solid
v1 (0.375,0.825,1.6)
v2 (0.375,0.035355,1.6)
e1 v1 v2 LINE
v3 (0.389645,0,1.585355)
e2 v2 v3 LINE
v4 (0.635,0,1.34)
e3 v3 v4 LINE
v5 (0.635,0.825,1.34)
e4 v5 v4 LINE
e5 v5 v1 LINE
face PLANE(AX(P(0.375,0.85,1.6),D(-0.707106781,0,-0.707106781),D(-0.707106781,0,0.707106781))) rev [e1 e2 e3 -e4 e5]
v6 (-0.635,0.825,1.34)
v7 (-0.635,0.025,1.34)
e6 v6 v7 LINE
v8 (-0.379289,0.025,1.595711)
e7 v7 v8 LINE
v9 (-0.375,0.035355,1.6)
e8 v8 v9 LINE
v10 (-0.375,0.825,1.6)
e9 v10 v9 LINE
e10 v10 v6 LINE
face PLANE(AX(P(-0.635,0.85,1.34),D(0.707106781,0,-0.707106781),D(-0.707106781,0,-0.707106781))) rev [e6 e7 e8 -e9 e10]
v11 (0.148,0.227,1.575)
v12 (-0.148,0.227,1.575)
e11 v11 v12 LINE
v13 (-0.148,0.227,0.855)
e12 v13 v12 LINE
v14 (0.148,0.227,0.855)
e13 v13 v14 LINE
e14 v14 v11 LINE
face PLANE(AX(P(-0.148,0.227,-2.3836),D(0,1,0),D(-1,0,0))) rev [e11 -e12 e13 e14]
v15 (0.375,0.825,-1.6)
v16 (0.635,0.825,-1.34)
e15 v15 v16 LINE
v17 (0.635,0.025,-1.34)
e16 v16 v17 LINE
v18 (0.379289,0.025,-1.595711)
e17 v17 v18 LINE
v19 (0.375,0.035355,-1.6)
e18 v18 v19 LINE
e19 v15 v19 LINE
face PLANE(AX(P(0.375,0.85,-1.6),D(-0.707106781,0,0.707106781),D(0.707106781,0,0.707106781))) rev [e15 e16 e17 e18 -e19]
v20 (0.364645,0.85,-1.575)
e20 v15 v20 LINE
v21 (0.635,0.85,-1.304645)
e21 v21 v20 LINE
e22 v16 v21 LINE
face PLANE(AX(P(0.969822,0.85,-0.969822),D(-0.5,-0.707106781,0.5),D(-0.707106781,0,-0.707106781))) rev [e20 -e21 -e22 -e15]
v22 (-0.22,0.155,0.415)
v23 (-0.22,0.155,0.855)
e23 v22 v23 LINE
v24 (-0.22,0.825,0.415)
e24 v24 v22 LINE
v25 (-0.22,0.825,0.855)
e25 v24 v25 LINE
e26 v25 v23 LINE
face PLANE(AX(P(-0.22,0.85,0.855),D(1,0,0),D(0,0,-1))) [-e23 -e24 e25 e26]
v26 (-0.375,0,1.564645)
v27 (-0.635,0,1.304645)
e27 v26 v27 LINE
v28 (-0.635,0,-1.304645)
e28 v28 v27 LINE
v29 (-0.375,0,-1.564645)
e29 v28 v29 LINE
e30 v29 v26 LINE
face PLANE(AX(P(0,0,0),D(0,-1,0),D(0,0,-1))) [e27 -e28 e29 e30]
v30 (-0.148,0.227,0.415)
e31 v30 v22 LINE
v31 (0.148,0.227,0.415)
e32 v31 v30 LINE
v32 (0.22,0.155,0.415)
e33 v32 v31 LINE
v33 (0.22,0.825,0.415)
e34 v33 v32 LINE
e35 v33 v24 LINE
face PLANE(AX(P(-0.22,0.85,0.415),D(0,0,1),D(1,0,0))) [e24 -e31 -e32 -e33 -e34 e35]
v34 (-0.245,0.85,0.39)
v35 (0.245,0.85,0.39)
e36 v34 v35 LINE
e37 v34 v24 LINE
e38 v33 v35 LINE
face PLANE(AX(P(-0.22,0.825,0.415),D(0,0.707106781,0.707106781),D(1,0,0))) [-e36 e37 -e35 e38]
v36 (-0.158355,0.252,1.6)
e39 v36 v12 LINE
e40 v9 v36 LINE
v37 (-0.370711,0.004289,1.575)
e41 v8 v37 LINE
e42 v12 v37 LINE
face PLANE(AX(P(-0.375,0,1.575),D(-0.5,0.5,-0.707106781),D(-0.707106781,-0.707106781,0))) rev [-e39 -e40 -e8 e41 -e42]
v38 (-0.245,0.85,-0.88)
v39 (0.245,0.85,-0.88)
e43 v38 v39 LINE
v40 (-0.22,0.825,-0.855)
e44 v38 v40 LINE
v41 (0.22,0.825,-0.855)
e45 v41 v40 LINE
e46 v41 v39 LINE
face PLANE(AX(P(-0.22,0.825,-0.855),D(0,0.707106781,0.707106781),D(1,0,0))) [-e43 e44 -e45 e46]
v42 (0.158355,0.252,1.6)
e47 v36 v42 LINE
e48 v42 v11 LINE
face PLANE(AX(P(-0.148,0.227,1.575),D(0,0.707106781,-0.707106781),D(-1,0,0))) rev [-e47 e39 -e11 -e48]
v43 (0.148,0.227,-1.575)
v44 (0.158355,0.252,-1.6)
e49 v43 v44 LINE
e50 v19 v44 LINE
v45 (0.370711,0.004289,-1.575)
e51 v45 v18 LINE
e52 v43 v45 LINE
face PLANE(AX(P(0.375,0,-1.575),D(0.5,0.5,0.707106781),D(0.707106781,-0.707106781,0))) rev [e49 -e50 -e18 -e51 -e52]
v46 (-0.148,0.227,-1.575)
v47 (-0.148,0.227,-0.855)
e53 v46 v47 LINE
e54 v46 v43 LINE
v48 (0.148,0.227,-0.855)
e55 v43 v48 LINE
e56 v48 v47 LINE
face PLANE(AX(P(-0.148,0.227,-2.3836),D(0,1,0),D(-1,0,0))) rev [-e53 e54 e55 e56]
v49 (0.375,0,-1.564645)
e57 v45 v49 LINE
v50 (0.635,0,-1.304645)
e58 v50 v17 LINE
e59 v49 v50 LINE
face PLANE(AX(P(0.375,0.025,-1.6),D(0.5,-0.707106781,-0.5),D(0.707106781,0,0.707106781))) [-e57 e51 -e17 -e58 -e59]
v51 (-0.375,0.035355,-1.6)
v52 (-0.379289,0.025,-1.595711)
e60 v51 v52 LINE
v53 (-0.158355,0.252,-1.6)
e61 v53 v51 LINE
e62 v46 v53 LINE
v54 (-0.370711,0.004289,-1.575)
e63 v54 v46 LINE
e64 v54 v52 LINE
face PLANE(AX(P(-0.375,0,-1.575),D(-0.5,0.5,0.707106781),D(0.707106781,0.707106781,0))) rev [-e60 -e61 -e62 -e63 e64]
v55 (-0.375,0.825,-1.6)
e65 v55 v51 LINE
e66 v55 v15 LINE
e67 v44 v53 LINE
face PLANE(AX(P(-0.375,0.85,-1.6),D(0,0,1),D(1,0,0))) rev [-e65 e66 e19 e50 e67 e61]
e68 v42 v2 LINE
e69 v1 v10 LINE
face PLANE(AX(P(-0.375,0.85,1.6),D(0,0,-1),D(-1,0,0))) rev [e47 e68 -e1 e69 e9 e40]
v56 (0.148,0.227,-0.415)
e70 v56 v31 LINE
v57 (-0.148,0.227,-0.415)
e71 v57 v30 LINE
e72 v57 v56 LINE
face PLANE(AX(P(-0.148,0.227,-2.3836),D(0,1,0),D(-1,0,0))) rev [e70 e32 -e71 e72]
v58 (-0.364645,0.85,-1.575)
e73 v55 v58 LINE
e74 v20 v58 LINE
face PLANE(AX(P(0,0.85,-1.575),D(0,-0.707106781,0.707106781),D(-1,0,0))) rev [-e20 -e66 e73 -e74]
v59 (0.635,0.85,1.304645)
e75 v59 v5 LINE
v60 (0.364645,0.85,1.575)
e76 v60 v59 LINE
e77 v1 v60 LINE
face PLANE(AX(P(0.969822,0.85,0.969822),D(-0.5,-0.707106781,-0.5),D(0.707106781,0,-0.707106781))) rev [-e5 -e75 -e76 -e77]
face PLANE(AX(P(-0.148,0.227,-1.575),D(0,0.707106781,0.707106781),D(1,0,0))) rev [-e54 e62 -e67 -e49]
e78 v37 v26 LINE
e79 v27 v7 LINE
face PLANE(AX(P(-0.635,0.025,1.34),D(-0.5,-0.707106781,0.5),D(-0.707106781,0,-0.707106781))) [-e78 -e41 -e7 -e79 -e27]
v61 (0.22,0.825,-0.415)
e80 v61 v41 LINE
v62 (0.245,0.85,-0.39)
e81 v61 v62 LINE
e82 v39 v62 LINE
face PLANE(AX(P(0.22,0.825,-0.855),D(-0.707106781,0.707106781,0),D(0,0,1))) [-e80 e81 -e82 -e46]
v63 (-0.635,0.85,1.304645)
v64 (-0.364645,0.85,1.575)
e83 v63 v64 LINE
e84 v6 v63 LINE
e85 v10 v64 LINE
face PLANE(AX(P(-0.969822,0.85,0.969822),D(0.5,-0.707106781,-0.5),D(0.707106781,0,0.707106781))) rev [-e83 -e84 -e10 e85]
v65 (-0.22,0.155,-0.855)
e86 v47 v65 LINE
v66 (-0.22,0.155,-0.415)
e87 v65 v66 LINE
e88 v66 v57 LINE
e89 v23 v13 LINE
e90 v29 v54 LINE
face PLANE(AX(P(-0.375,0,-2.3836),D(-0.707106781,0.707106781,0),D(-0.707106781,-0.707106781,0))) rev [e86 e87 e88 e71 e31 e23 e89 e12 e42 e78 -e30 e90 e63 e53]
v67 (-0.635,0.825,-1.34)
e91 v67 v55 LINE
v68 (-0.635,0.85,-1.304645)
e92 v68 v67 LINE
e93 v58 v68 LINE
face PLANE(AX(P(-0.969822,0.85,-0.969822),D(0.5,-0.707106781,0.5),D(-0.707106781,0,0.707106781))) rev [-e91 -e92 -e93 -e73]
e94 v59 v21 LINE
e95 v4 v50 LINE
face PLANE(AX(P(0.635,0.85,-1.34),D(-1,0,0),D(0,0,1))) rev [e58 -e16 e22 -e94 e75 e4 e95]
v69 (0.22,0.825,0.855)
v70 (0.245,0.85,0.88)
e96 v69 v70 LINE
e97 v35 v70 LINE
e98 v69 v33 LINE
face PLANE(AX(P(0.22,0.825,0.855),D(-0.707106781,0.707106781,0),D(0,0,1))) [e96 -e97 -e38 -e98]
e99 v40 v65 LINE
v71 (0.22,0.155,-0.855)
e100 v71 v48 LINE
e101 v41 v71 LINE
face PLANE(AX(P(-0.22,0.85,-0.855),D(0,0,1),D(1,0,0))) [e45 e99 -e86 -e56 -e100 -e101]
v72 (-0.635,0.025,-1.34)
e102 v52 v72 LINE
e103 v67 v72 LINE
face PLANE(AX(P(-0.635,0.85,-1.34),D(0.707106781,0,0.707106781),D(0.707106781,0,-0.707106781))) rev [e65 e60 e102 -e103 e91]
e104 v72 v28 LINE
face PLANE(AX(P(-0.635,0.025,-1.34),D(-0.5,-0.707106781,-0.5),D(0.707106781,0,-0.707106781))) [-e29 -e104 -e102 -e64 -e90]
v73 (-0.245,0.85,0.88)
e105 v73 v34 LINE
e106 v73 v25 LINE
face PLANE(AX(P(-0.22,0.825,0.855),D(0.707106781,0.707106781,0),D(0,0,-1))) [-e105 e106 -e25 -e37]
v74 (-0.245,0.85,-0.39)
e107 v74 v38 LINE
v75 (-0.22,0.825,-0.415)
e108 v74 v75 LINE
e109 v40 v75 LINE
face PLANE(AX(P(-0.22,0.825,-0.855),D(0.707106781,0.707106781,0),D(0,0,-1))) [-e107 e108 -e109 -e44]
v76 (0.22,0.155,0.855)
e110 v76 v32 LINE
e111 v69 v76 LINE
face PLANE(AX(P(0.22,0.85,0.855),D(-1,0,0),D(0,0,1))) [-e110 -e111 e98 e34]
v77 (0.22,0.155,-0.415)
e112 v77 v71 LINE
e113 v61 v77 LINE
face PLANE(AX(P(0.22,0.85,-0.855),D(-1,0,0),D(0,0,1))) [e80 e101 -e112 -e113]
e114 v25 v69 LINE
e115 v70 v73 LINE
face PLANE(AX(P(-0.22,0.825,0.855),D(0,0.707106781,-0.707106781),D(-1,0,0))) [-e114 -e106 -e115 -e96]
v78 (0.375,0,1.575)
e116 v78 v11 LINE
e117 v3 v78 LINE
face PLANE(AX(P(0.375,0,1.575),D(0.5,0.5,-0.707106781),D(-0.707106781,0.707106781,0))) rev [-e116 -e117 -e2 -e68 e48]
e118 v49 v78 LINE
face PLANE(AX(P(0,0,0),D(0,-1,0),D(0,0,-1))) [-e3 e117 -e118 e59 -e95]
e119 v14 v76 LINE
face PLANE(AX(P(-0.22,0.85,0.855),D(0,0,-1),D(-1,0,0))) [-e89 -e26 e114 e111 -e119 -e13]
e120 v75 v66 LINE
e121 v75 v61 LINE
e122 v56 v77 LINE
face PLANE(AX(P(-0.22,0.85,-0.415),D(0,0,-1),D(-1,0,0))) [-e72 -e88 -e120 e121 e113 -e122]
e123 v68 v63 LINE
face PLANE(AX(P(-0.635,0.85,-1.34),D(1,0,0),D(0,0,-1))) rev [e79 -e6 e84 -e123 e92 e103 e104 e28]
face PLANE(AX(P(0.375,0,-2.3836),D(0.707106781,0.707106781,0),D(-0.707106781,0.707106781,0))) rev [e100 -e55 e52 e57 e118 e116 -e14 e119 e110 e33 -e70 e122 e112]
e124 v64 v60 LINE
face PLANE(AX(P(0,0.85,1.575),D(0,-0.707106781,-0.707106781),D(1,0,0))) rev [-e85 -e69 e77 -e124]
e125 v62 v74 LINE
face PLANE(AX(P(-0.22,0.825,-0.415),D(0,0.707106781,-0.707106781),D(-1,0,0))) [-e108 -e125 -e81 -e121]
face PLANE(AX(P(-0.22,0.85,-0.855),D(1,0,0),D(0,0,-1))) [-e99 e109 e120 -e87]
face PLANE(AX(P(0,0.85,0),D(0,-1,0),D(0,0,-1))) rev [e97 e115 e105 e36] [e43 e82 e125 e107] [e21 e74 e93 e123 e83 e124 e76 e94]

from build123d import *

# Parameters (mm, degrees)
SKETCH5_W           = 0.44
SKETCH5_H           = 0.44
BOSS_EXTRUDE1_DEPTH = 0.85
CUT_EXTRUDE1_REACH  = 5.371
CHAMFER1_SIZE       = 0.025


with BuildPart() as part:
    # Sketch5 → Boss-Extrude1 (new body)
    with BuildSketch(Plane(origin=(0, 0, 0), x_dir=(1, 0, 0), z_dir=(0, 1, 0))):
        Polygon((-0.375, 1.6), (0.375, 1.6), (0.635, 1.34), (0.635, -1.34), (0.375, -1.6), (-0.375, -1.6), (-0.635, -1.34), (-0.635, 1.34), align=None)
        with Locations((0, 0.635)):
            Rectangle(SKETCH5_W, SKETCH5_H, mode=Mode.SUBTRACT)
        with Locations((0, -0.635)):
            Rectangle(SKETCH5_W, SKETCH5_H, mode=Mode.SUBTRACT)
    extrude(amount=BOSS_EXTRUDE1_DEPTH)

    # Cut-Extrude1: up to this face of the body (flat: up to its plane)
    cut_extrude1_end = Plane(part.part.faces().sort_by_distance((0, 0.425, -1.6))[0])
    # Sketch6 → Cut-Extrude1 (cut, up to the picked face)
    with BuildSketch(Plane.XY.offset(1.6), mode=Mode.PRIVATE) as cut_extrude1_sk1:
        Polygon((-0.375, 0), (-0.148, 0.227), (0.148, 0.227), (0.375, 0), align=None)
    cut_extrude1_tool1 = split(extrude(cut_extrude1_sk1.sketch, amount=-CUT_EXTRUDE1_REACH, mode=Mode.PRIVATE), bisect_by=cut_extrude1_end, keep=Keep.BOTH, mode=Mode.PRIVATE)
    add(cut_extrude1_tool1.solids().sort_by(Axis((0, 0.097079, 1.6), (0, 0, -1)))[0], mode=Mode.SUBTRACT)

    # Chamfer1
    # the kernel refuses this chamfer: 0.025 mm, written as the material it takes off along each edge
    with BuildSketch(Plane(origin=(-0.329538638, 0, 1.645461362), x_dir=(0.7068394360706735, -0.027495876610586514, -0.7068394360706735), z_dir=(-0.7071067811865476, 0, -0.7071067811865476)), Plane(origin=(0.329538638, 0.85, -1.645461362), x_dir=(0.019442520806015277, -0.9996219169112966, -0.01944252080601526), z_dir=(0.7071067811865472, 0, 0.7071067811865479))) as chamfer1_piece_1:
        Polygon((CHAMFER1_SIZE * 0.999621916911, -CHAMFER1_SIZE * 0.0274958766106), (-CHAMFER1_SIZE * 0.0274958766106, -CHAMFER1_SIZE * 0.999621916911), (0, 0), align=None)
    extrude(amount=0.496279676, mode=Mode.SUBTRACT)
    with BuildSketch(Plane(origin=(-0.680461362, 0, -1.294538638), x_dir=(-0.01944252080601428, 0.9996219169112966, -0.019442520806014163), z_dir=(0.7071067811865455, 0, -0.7071067811865497)), Plane(origin=(-0.329538638, 0.85, 1.645461362), x_dir=(0.7068394360706735, 0.027495876610587406, -0.7068394360706735), z_dir=(-0.7071067811865476, 0, -0.7071067811865476)), Plane(origin=(0.680461362, 0.85, 1.294538638), x_dir=(-0.7068394360706735, 0.02749587661058749, -0.7068394360706735), z_dir=(-0.7071067811865476, 0, 0.7071067811865476)), Plane(origin=(-0.680461362, 0.85, -1.294538638), x_dir=(0.7068394360706755, 0.02749587661058732, 0.7068394360706715), z_dir=(0.7071067811865455, 0, -0.7071067811865497)), Plane(origin=(0.329538638, 0, -1.645461362), x_dir=(0.019442520806010995, 0.9996219169112968, -0.019442520806010978), z_dir=(0.7071067811865472, 0, 0.7071067811865479))) as chamfer1_piece_2:
        Polygon((CHAMFER1_SIZE * 0.999621916911, CHAMFER1_SIZE * 0.0274958766106), (-CHAMFER1_SIZE * 0.0274958766106, CHAMFER1_SIZE * 0.999621916911), (0, 0), align=None)
    extrude(amount=0.496279676, mode=Mode.SUBTRACT)
    with BuildSketch(Plane(origin=(0.439292075, 0.85, 1.6), x_dir=(0, 0.02749587661058742, -0.9996219169112966), z_dir=(-1, 0, 0))) as chamfer1_piece_3:
        Polygon((CHAMFER1_SIZE * 0.999621916911, CHAMFER1_SIZE * 0.0274958766106), (-CHAMFER1_SIZE * 0.0274958766106, CHAMFER1_SIZE * 0.999621916911), (0, 0), align=None)
    extrude(amount=0.878584149, mode=Mode.SUBTRACT)
    with BuildSketch(Plane(origin=(0.22, 0.85, -0.855), x_dir=(0.9996219169112966, 0.02749587661058736, 0), z_dir=(0, 0, 1)), Plane(origin=(-0.22, 0.85, -0.855), x_dir=(0, 0.027495876610587302, -0.9996219169112966), z_dir=(1, 0, 0)), Plane(origin=(-0.22, 0.85, -0.415), x_dir=(-0.9996219169112966, 0.02749587661058736, 0), z_dir=(0, 0, -1)), Plane(origin=(0.22, 0.85, -0.415), x_dir=(0, 0.027495876610587302, 0.9996219169112966), z_dir=(-1, 0, 0)), Plane(origin=(-0.22, 0.85, 0.855), x_dir=(-0.9996219169112966, 0.02749587661058736, 0), z_dir=(0, 0, -1)), Plane(origin=(0.22, 0.85, 0.855), x_dir=(0, 0.027495876610587302, 0.9996219169112966), z_dir=(-1, 0, 0)), Plane(origin=(0.22, 0.85, 0.415), x_dir=(0.9996219169112966, 0.02749587661058736, 0), z_dir=(0, 0, 1)), Plane(origin=(-0.22, 0.85, 0.415), x_dir=(0, 0.027495876610587302, -0.9996219169112966), z_dir=(1, 0, 0))) as chamfer1_piece_4:
        Polygon((CHAMFER1_SIZE * 0.999621916911, -CHAMFER1_SIZE * 0.0274958766106), (-CHAMFER1_SIZE * 0.0274958766106, -CHAMFER1_SIZE * 0.999621916911), (0, 0), align=None)
    extrude(amount=0.44, mode=Mode.SUBTRACT)
    with BuildSketch(Plane(origin=(-0.439292075, 0.85, -1.6), x_dir=(0, -0.9996219169112966, -0.027495876610587302), z_dir=(1, 0, 0))) as chamfer1_piece_5:
        Polygon((CHAMFER1_SIZE * 0.999621916911, -CHAMFER1_SIZE * 0.0274958766106), (-CHAMFER1_SIZE * 0.0274958766106, -CHAMFER1_SIZE * 0.999621916911), (0, 0), align=None)
    extrude(amount=0.878584149, mode=Mode.SUBTRACT)
    with BuildSketch(Plane(origin=(0.102538638, 0.272461362, 1.6), x_dir=(-0.019442520806014184, -0.01944252080601436, -0.9996219169112966), z_dir=(0.7071067811865508, -0.7071067811865442, 0))) as chamfer1_piece_6_section:
        Polygon((CHAMFER1_SIZE * 0.999621916911, CHAMFER1_SIZE * 0.0274958766106), (-CHAMFER1_SIZE * 0.0274958766106, CHAMFER1_SIZE * 0.999621916911), (0, 0), align=None)
    chamfer1_piece_6 = extrude(amount=0.449610628, mode=Mode.PRIVATE)
    chamfer1_piece_6 = split(chamfer1_piece_6, bisect_by=Plane(origin=(0.292864015, 0.227, 1.591698889), z_dir=(0, -1, 0)), keep=Keep.TOP, mode=Mode.PRIVATE)
    add(chamfer1_piece_6, mode=Mode.SUBTRACT)
    with BuildSketch(Plane(origin=(-0.212292075, 0.227, 1.6), x_dir=(0, 0.9996219169112966, 0.02749587661058733), z_dir=(1, 0, 0))) as chamfer1_piece_7_section:
        Polygon((CHAMFER1_SIZE * 0.999621916911, -CHAMFER1_SIZE * 0.0274958766106), (-CHAMFER1_SIZE * 0.0274958766106, -CHAMFER1_SIZE * 0.999621916911), (0, 0), align=None)
    chamfer1_piece_7 = extrude(amount=0.424584149, mode=Mode.PRIVATE)
    chamfer1_piece_7 = split(chamfer1_piece_7, bisect_by=Plane(origin=(-0.070019575, 0.304980425, 1.591603337), z_dir=(0.707106781186544, -0.7071067811865511, 0)), keep=Keep.TOP, mode=Mode.PRIVATE)
    chamfer1_piece_7 = split(chamfer1_piece_7, bisect_by=Plane(origin=(0.070019575, 0.304980425, 1.591603337), z_dir=(-0.7071067811865442, -0.7071067811865508, 0)), keep=Keep.TOP, mode=Mode.PRIVATE)
    add(chamfer1_piece_7, mode=Mode.SUBTRACT)
    with BuildSketch(Plane(origin=(-0.420461362, -0.045461362, 1.6), x_dir=(0.019442520806013903, -0.019442520806014097, -0.9996219169112966), z_dir=(0.7071067811865511, 0.707106781186544, 0))) as chamfer1_piece_8_section:
        Polygon((CHAMFER1_SIZE * 0.999621916911, CHAMFER1_SIZE * 0.0274958766106), (-CHAMFER1_SIZE * 0.0274958766106, CHAMFER1_SIZE * 0.999621916911), (0, 0), align=None)
    chamfer1_piece_8 = extrude(amount=0.449610628, mode=Mode.PRIVATE)
    chamfer1_piece_8 = split(chamfer1_piece_8, bisect_by=Plane(origin=(-0.292864015, 0.227, 1.591698889), z_dir=(0, -1, 0)), keep=Keep.TOP, mode=Mode.PRIVATE)
    add(chamfer1_piece_8, mode=Mode.SUBTRACT)
    with BuildSketch(Plane(origin=(-0.420461362, -0.045461362, -1.6), x_dir=(-0.7068394360706672, 0.7068394360706742, -0.02749587661072924), z_dir=(0.7071067811865511, 0.707106781186544, 0))) as chamfer1_piece_9_section:
        Polygon((CHAMFER1_SIZE * 0.999621916911, CHAMFER1_SIZE * 0.0274958766107), (-CHAMFER1_SIZE * 0.0274958766006, CHAMFER1_SIZE * 0.999621916912), (0, 0), align=None)
    chamfer1_piece_9 = extrude(amount=0.449610628, mode=Mode.PRIVATE)
    chamfer1_piece_9 = split(chamfer1_piece_9, bisect_by=Plane(origin=(-0.292864015, 0.227, -1.591698889), z_dir=(0, -1, 0)), keep=Keep.TOP, mode=Mode.PRIVATE)
    add(chamfer1_piece_9, mode=Mode.SUBTRACT)
    with BuildSketch(Plane(origin=(-0.212292075, 0.227, -1.6), x_dir=(0, 0.9996219169112966, -0.02749587661058733), z_dir=(1, 0, 0))) as chamfer1_piece_10_section:
        Polygon((CHAMFER1_SIZE * 0.999621916911, CHAMFER1_SIZE * 0.0274958766106), (-CHAMFER1_SIZE * 0.0274958766106, CHAMFER1_SIZE * 0.999621916911), (0, 0), align=None)
    chamfer1_piece_10 = extrude(amount=0.424584149, mode=Mode.PRIVATE)
    chamfer1_piece_10 = split(chamfer1_piece_10, bisect_by=Plane(origin=(-0.070019575, 0.304980425, -1.591603337), z_dir=(0.707106781186544, -0.7071067811865511, 0)), keep=Keep.TOP, mode=Mode.PRIVATE)
    chamfer1_piece_10 = split(chamfer1_piece_10, bisect_by=Plane(origin=(0.070019575, 0.304980425, -1.591603337), z_dir=(-0.7071067811865442, -0.7071067811865508, 0)), keep=Keep.TOP, mode=Mode.PRIVATE)
    add(chamfer1_piece_10, mode=Mode.SUBTRACT)
    with BuildSketch(Plane(origin=(0.102538638, 0.272461362, -1.6), x_dir=(0.7068394360706932, 0.7068394360706998, -0.027495876609399512), z_dir=(0.7071067811865508, -0.7071067811865442, 0))) as chamfer1_piece_11_section:
        Polygon((CHAMFER1_SIZE * 0.999621916911, CHAMFER1_SIZE * 0.0274958766094), (-CHAMFER1_SIZE * 0.0274958766932, CHAMFER1_SIZE * 0.999621916909), (0, 0), align=None)
    chamfer1_piece_11 = extrude(amount=0.449610628, mode=Mode.PRIVATE)
    chamfer1_piece_11 = split(chamfer1_piece_11, bisect_by=Plane(origin=(0.292864015, 0.227, -1.591698889), z_dir=(0, -1, 0)), keep=Keep.TOP, mode=Mode.PRIVATE)
    add(chamfer1_piece_11, mode=Mode.SUBTRACT)
    with BuildSketch(Plane(origin=(0.22, 0.85, -0.919292075), x_dir=(0.9996219169112966, 0.02749587661058736, 0), z_dir=(0, 0, 1))) as chamfer1_piece_12a_section:
        Polygon((CHAMFER1_SIZE * 0.999621916911, -CHAMFER1_SIZE * 0.0274958766106), (-CHAMFER1_SIZE * 0.0274958766106, -CHAMFER1_SIZE * 0.999621916911), (0, 0), align=None)
    chamfer1_piece_12a = extrude(amount=0.504292075, mode=Mode.PRIVATE)
    chamfer1_piece_12a = split(chamfer1_piece_12a, bisect_by=Plane(origin=(0.228244841, 0.841755159, -0.855), z_dir=(0, 0, -1)), keep=Keep.TOP, mode=Mode.PRIVATE)
    with BuildSketch(Plane(origin=(-0.22, 0.85, -0.855), x_dir=(0, 0.027495876610587302, -0.9996219169112966), z_dir=(1, 0, 0))) as chamfer1_piece_12b_section:
        Polygon((CHAMFER1_SIZE * 0.999621916911, -CHAMFER1_SIZE * 0.0274958766106), (-CHAMFER1_SIZE * 0.0274958766106, -CHAMFER1_SIZE * 0.999621916911), (0, 0), align=None)
    chamfer1_piece_12b = extrude(amount=0.504292075, mode=Mode.PRIVATE)
    chamfer1_piece_12b = split(chamfer1_piece_12b, bisect_by=Plane(origin=(0.22, 0.841755159, -0.863244841), z_dir=(1, 0, 0)), keep=Keep.TOP, mode=Mode.PRIVATE)
    chamfer1_piece_12 = chamfer1_piece_12a & chamfer1_piece_12b
    add(chamfer1_piece_12, mode=Mode.SUBTRACT)
    with BuildSketch(Plane(origin=(0.284292075, 0.85, -0.415), x_dir=(0, 0.027495876610587302, 0.9996219169112966), z_dir=(-1, 0, 0))) as chamfer1_piece_13a_section:
        Polygon((CHAMFER1_SIZE * 0.999621916911, -CHAMFER1_SIZE * 0.0274958766106), (-CHAMFER1_SIZE * 0.0274958766106, -CHAMFER1_SIZE * 0.999621916911), (0, 0), align=None)
    chamfer1_piece_13a = extrude(amount=0.504292075, mode=Mode.PRIVATE)
    chamfer1_piece_13a = split(chamfer1_piece_13a, bisect_by=Plane(origin=(0.22, 0.841755159, -0.406755159), z_dir=(1, 0, 0)), keep=Keep.TOP, mode=Mode.PRIVATE)
    with BuildSketch(Plane(origin=(0.22, 0.85, -0.855), x_dir=(0.9996219169112966, 0.02749587661058736, 0), z_dir=(0, 0, 1))) as chamfer1_piece_13b_section:
        Polygon((CHAMFER1_SIZE * 0.999621916911, -CHAMFER1_SIZE * 0.0274958766106), (-CHAMFER1_SIZE * 0.0274958766106, -CHAMFER1_SIZE * 0.999621916911), (0, 0), align=None)
    chamfer1_piece_13b = extrude(amount=0.504292075, mode=Mode.PRIVATE)
    chamfer1_piece_13b = split(chamfer1_piece_13b, bisect_by=Plane(origin=(0.228244841, 0.841755159, -0.415), z_dir=(0, 0, 1)), keep=Keep.TOP, mode=Mode.PRIVATE)
    chamfer1_piece_13 = chamfer1_piece_13a & chamfer1_piece_13b
    add(chamfer1_piece_13, mode=Mode.SUBTRACT)
    with BuildSketch(Plane(origin=(-0.22, 0.85, -0.415), x_dir=(-0.9996219169112966, 0.02749587661058736, 0), z_dir=(0, 0, -1))) as chamfer1_piece_14a_section:
        Polygon((CHAMFER1_SIZE * 0.999621916911, -CHAMFER1_SIZE * 0.0274958766106), (-CHAMFER1_SIZE * 0.0274958766106, -CHAMFER1_SIZE * 0.999621916911), (0, 0), align=None)
    chamfer1_piece_14a = extrude(amount=0.504292075, mode=Mode.PRIVATE)
    chamfer1_piece_14a = split(chamfer1_piece_14a, bisect_by=Plane(origin=(-0.228244841, 0.841755159, -0.855), z_dir=(0, 0, -1)), keep=Keep.TOP, mode=Mode.PRIVATE)
    with BuildSketch(Plane(origin=(-0.284292075, 0.85, -0.855), x_dir=(0, 0.027495876610587302, -0.9996219169112966), z_dir=(1, 0, 0))) as chamfer1_piece_14b_section:
        Polygon((CHAMFER1_SIZE * 0.999621916911, -CHAMFER1_SIZE * 0.0274958766106), (-CHAMFER1_SIZE * 0.0274958766106, -CHAMFER1_SIZE * 0.999621916911), (0, 0), align=None)
    chamfer1_piece_14b = extrude(amount=0.504292075, mode=Mode.PRIVATE)
    chamfer1_piece_14b = split(chamfer1_piece_14b, bisect_by=Plane(origin=(-0.22, 0.841755159, -0.863244841), z_dir=(-1, 0, 0)), keep=Keep.TOP, mode=Mode.PRIVATE)
    chamfer1_piece_14 = chamfer1_piece_14a & chamfer1_piece_14b
    add(chamfer1_piece_14, mode=Mode.SUBTRACT)
    with BuildSketch(Plane(origin=(-0.22, 0.85, -0.350707925), x_dir=(-0.9996219169112966, 0.02749587661058736, 0), z_dir=(0, 0, -1))) as chamfer1_piece_15a_section:
        Polygon((CHAMFER1_SIZE * 0.999621916911, -CHAMFER1_SIZE * 0.0274958766106), (-CHAMFER1_SIZE * 0.0274958766106, -CHAMFER1_SIZE * 0.999621916911), (0, 0), align=None)
    chamfer1_piece_15a = extrude(amount=0.504292075, mode=Mode.PRIVATE)
    chamfer1_piece_15a = split(chamfer1_piece_15a, bisect_by=Plane(origin=(-0.228244841, 0.841755159, -0.415), z_dir=(0, 0, 1)), keep=Keep.TOP, mode=Mode.PRIVATE)
    with BuildSketch(Plane(origin=(0.22, 0.85, -0.415), x_dir=(0, 0.027495876610587302, 0.9996219169112966), z_dir=(-1, 0, 0))) as chamfer1_piece_15b_section:
        Polygon((CHAMFER1_SIZE * 0.999621916911, -CHAMFER1_SIZE * 0.0274958766106), (-CHAMFER1_SIZE * 0.0274958766106, -CHAMFER1_SIZE * 0.999621916911), (0, 0), align=None)
    chamfer1_piece_15b = extrude(amount=0.504292075, mode=Mode.PRIVATE)
    chamfer1_piece_15b = split(chamfer1_piece_15b, bisect_by=Plane(origin=(-0.22, 0.841755159, -0.406755159), z_dir=(-1, 0, 0)), keep=Keep.TOP, mode=Mode.PRIVATE)
    chamfer1_piece_15 = chamfer1_piece_15a & chamfer1_piece_15b
    add(chamfer1_piece_15, mode=Mode.SUBTRACT)
    with BuildSketch(Plane(origin=(-0.22, 0.85, 0.919292075), x_dir=(-0.9996219169112966, 0.02749587661058736, 0), z_dir=(0, 0, -1))) as chamfer1_piece_16a_section:
        Polygon((CHAMFER1_SIZE * 0.999621916911, -CHAMFER1_SIZE * 0.0274958766106), (-CHAMFER1_SIZE * 0.0274958766106, -CHAMFER1_SIZE * 0.999621916911), (0, 0), align=None)
    chamfer1_piece_16a = extrude(amount=0.504292075, mode=Mode.PRIVATE)
    chamfer1_piece_16a = split(chamfer1_piece_16a, bisect_by=Plane(origin=(-0.228244841, 0.841755159, 0.855), z_dir=(0, 0, 1)), keep=Keep.TOP, mode=Mode.PRIVATE)
    with BuildSketch(Plane(origin=(0.22, 0.85, 0.855), x_dir=(0, 0.027495876610587302, 0.9996219169112966), z_dir=(-1, 0, 0))) as chamfer1_piece_16b_section:
        Polygon((CHAMFER1_SIZE * 0.999621916911, -CHAMFER1_SIZE * 0.0274958766106), (-CHAMFER1_SIZE * 0.0274958766106, -CHAMFER1_SIZE * 0.999621916911), (0, 0), align=None)
    chamfer1_piece_16b = extrude(amount=0.504292075, mode=Mode.PRIVATE)
    chamfer1_piece_16b = split(chamfer1_piece_16b, bisect_by=Plane(origin=(-0.22, 0.841755159, 0.863244841), z_dir=(-1, 0, 0)), keep=Keep.TOP, mode=Mode.PRIVATE)
    chamfer1_piece_16 = chamfer1_piece_16a & chamfer1_piece_16b
    add(chamfer1_piece_16, mode=Mode.SUBTRACT)
    with BuildSketch(Plane(origin=(-0.22, 0.85, 0.855), x_dir=(-0.9996219169112966, 0.02749587661058736, 0), z_dir=(0, 0, -1))) as chamfer1_piece_17a_section:
        Polygon((CHAMFER1_SIZE * 0.999621916911, -CHAMFER1_SIZE * 0.0274958766106), (-CHAMFER1_SIZE * 0.0274958766106, -CHAMFER1_SIZE * 0.999621916911), (0, 0), align=None)
    chamfer1_piece_17a = extrude(amount=0.504292075, mode=Mode.PRIVATE)
    chamfer1_piece_17a = split(chamfer1_piece_17a, bisect_by=Plane(origin=(-0.228244841, 0.841755159, 0.415), z_dir=(0, 0, -1)), keep=Keep.TOP, mode=Mode.PRIVATE)
    with BuildSketch(Plane(origin=(-0.284292075, 0.85, 0.415), x_dir=(0, 0.027495876610587302, -0.9996219169112966), z_dir=(1, 0, 0))) as chamfer1_piece_17b_section:
        Polygon((CHAMFER1_SIZE * 0.999621916911, -CHAMFER1_SIZE * 0.0274958766106), (-CHAMFER1_SIZE * 0.0274958766106, -CHAMFER1_SIZE * 0.999621916911), (0, 0), align=None)
    chamfer1_piece_17b = extrude(amount=0.504292075, mode=Mode.PRIVATE)
    chamfer1_piece_17b = split(chamfer1_piece_17b, bisect_by=Plane(origin=(-0.22, 0.841755159, 0.406755159), z_dir=(-1, 0, 0)), keep=Keep.TOP, mode=Mode.PRIVATE)
    chamfer1_piece_17 = chamfer1_piece_17a & chamfer1_piece_17b
    add(chamfer1_piece_17, mode=Mode.SUBTRACT)
    with BuildSketch(Plane(origin=(0.284292075, 0.85, 0.855), x_dir=(0, 0.027495876610587302, 0.9996219169112966), z_dir=(-1, 0, 0))) as chamfer1_piece_18a_section:
        Polygon((CHAMFER1_SIZE * 0.999621916911, -CHAMFER1_SIZE * 0.0274958766106), (-CHAMFER1_SIZE * 0.0274958766106, -CHAMFER1_SIZE * 0.999621916911), (0, 0), align=None)
    chamfer1_piece_18a = extrude(amount=0.504292075, mode=Mode.PRIVATE)
    chamfer1_piece_18a = split(chamfer1_piece_18a, bisect_by=Plane(origin=(0.22, 0.841755159, 0.863244841), z_dir=(1, 0, 0)), keep=Keep.TOP, mode=Mode.PRIVATE)
    with BuildSketch(Plane(origin=(0.22, 0.85, 0.415), x_dir=(0.9996219169112966, 0.02749587661058736, 0), z_dir=(0, 0, 1))) as chamfer1_piece_18b_section:
        Polygon((CHAMFER1_SIZE * 0.999621916911, -CHAMFER1_SIZE * 0.0274958766106), (-CHAMFER1_SIZE * 0.0274958766106, -CHAMFER1_SIZE * 0.999621916911), (0, 0), align=None)
    chamfer1_piece_18b = extrude(amount=0.504292075, mode=Mode.PRIVATE)
    chamfer1_piece_18b = split(chamfer1_piece_18b, bisect_by=Plane(origin=(0.228244841, 0.841755159, 0.855), z_dir=(0, 0, 1)), keep=Keep.TOP, mode=Mode.PRIVATE)
    chamfer1_piece_18 = chamfer1_piece_18a & chamfer1_piece_18b
    add(chamfer1_piece_18, mode=Mode.SUBTRACT)
    with BuildSketch(Plane(origin=(0.22, 0.85, 0.350707925), x_dir=(0.9996219169112966, 0.02749587661058736, 0), z_dir=(0, 0, 1))) as chamfer1_piece_19a_section:
        Polygon((CHAMFER1_SIZE * 0.999621916911, -CHAMFER1_SIZE * 0.0274958766106), (-CHAMFER1_SIZE * 0.0274958766106, -CHAMFER1_SIZE * 0.999621916911), (0, 0), align=None)
    chamfer1_piece_19a = extrude(amount=0.504292075, mode=Mode.PRIVATE)
    chamfer1_piece_19a = split(chamfer1_piece_19a, bisect_by=Plane(origin=(0.228244841, 0.841755159, 0.415), z_dir=(0, 0, -1)), keep=Keep.TOP, mode=Mode.PRIVATE)
    with BuildSketch(Plane(origin=(-0.22, 0.85, 0.415), x_dir=(0, 0.027495876610587302, -0.9996219169112966), z_dir=(1, 0, 0))) as chamfer1_piece_19b_section:
        Polygon((CHAMFER1_SIZE * 0.999621916911, -CHAMFER1_SIZE * 0.0274958766106), (-CHAMFER1_SIZE * 0.0274958766106, -CHAMFER1_SIZE * 0.999621916911), (0, 0), align=None)
    chamfer1_piece_19b = extrude(amount=0.504292075, mode=Mode.PRIVATE)
    chamfer1_piece_19b = split(chamfer1_piece_19b, bisect_by=Plane(origin=(0.22, 0.841755159, 0.406755159), z_dir=(1, 0, 0)), keep=Keep.TOP, mode=Mode.PRIVATE)
    chamfer1_piece_19 = chamfer1_piece_19a & chamfer1_piece_19b
    add(chamfer1_piece_19, mode=Mode.SUBTRACT)
    with BuildSketch(Plane(origin=(0.102538638, 0.272461362, 1.6), x_dir=(-0.019442520806014184, -0.01944252080601436, -0.9996219169112966), z_dir=(0.7071067811865508, -0.7071067811865442, 0))) as chamfer1_piece_20a_section:
        Polygon((CHAMFER1_SIZE * 0.999621916911, CHAMFER1_SIZE * 0.0274958766106), (-CHAMFER1_SIZE * 0.0274958766106, CHAMFER1_SIZE * 0.999621916911), (0, 0), align=None)
    chamfer1_piece_20a = extrude(amount=0.449610628, mode=Mode.PRIVATE)
    chamfer1_piece_20a = split(chamfer1_piece_20a, bisect_by=Plane(origin=(0.134594641, 0.227, 1.592047672), z_dir=(0, 1, 0)), keep=Keep.TOP, mode=Mode.PRIVATE)
    with BuildSketch(Plane(origin=(-0.212292075, 0.227, 1.6), x_dir=(0, 0.9996219169112966, 0.02749587661058733), z_dir=(1, 0, 0))) as chamfer1_piece_20b_section:
        Polygon((CHAMFER1_SIZE * 0.999621916911, -CHAMFER1_SIZE * 0.0274958766106), (-CHAMFER1_SIZE * 0.0274958766106, -CHAMFER1_SIZE * 0.999621916911), (0, 0), align=None)
    chamfer1_piece_20b = extrude(amount=0.424584149, mode=Mode.PRIVATE)
    chamfer1_piece_20b = split(chamfer1_piece_20b, bisect_by=Plane(origin=(0.15747902, 0.21752098, 1.592047672), z_dir=(0.7071067811865442, 0.7071067811865508, 0)), keep=Keep.TOP, mode=Mode.PRIVATE)
    chamfer1_piece_20 = chamfer1_piece_20a & chamfer1_piece_20b
    add(chamfer1_piece_20, mode=Mode.SUBTRACT)
    with BuildSketch(Plane(origin=(-0.420461362, -0.045461362, 1.6), x_dir=(0.019442520806013903, -0.019442520806014097, -0.9996219169112966), z_dir=(0.7071067811865511, 0.707106781186544, 0))) as chamfer1_piece_21a_section:
        Polygon((CHAMFER1_SIZE * 0.999621916911, CHAMFER1_SIZE * 0.0274958766106), (-CHAMFER1_SIZE * 0.0274958766106, CHAMFER1_SIZE * 0.999621916911), (0, 0), align=None)
    chamfer1_piece_21a = extrude(amount=0.449610628, mode=Mode.PRIVATE)
    chamfer1_piece_21a = split(chamfer1_piece_21a, bisect_by=Plane(origin=(-0.134594641, 0.227, 1.592047672), z_dir=(0, 1, 0)), keep=Keep.TOP, mode=Mode.PRIVATE)
    with BuildSketch(Plane(origin=(-0.212292075, 0.227, 1.6), x_dir=(0, 0.9996219169112966, 0.02749587661058733), z_dir=(1, 0, 0))) as chamfer1_piece_21b_section:
        Polygon((CHAMFER1_SIZE * 0.999621916911, -CHAMFER1_SIZE * 0.0274958766106), (-CHAMFER1_SIZE * 0.0274958766106, -CHAMFER1_SIZE * 0.999621916911), (0, 0), align=None)
    chamfer1_piece_21b = extrude(amount=0.424584149, mode=Mode.PRIVATE)
    chamfer1_piece_21b = split(chamfer1_piece_21b, bisect_by=Plane(origin=(-0.15747902, 0.21752098, 1.592047672), z_dir=(-0.707106781186544, 0.7071067811865511, 0)), keep=Keep.TOP, mode=Mode.PRIVATE)
    chamfer1_piece_21 = chamfer1_piece_21a & chamfer1_piece_21b
    add(chamfer1_piece_21, mode=Mode.SUBTRACT)
    with BuildSketch(Plane(origin=(-0.420461362, -0.045461362, -1.6), x_dir=(-0.7068394360706672, 0.7068394360706742, -0.02749587661072924), z_dir=(0.7071067811865511, 0.707106781186544, 0))) as chamfer1_piece_22a_section:
        Polygon((CHAMFER1_SIZE * 0.999621916911, CHAMFER1_SIZE * 0.0274958766107), (-CHAMFER1_SIZE * 0.0274958766006, CHAMFER1_SIZE * 0.999621916912), (0, 0), align=None)
    chamfer1_piece_22a = extrude(amount=0.449610628, mode=Mode.PRIVATE)
    chamfer1_piece_22a = split(chamfer1_piece_22a, bisect_by=Plane(origin=(-0.134594641, 0.227, -1.592047672), z_dir=(0, 1, 0)), keep=Keep.TOP, mode=Mode.PRIVATE)
    with BuildSketch(Plane(origin=(-0.212292075, 0.227, -1.6), x_dir=(0, 0.9996219169112966, -0.02749587661058733), z_dir=(1, 0, 0))) as chamfer1_piece_22b_section:
        Polygon((CHAMFER1_SIZE * 0.999621916911, CHAMFER1_SIZE * 0.0274958766106), (-CHAMFER1_SIZE * 0.0274958766106, CHAMFER1_SIZE * 0.999621916911), (0, 0), align=None)
    chamfer1_piece_22b = extrude(amount=0.424584149, mode=Mode.PRIVATE)
    chamfer1_piece_22b = split(chamfer1_piece_22b, bisect_by=Plane(origin=(-0.15747902, 0.21752098, -1.592047672), z_dir=(-0.707106781186544, 0.7071067811865511, 0)), keep=Keep.TOP, mode=Mode.PRIVATE)
    chamfer1_piece_22 = chamfer1_piece_22a & chamfer1_piece_22b
    add(chamfer1_piece_22, mode=Mode.SUBTRACT)
    with BuildSketch(Plane(origin=(-0.212292075, 0.227, -1.6), x_dir=(0, 0.9996219169112966, -0.02749587661058733), z_dir=(1, 0, 0))) as chamfer1_piece_23a_section:
        Polygon((CHAMFER1_SIZE * 0.999621916911, CHAMFER1_SIZE * 0.0274958766106), (-CHAMFER1_SIZE * 0.0274958766106, CHAMFER1_SIZE * 0.999621916911), (0, 0), align=None)
    chamfer1_piece_23a = extrude(amount=0.424584149, mode=Mode.PRIVATE)
    chamfer1_piece_23a = split(chamfer1_piece_23a, bisect_by=Plane(origin=(0.15747902, 0.21752098, -1.592047672), z_dir=(0.7071067811865442, 0.7071067811865508, 0)), keep=Keep.TOP, mode=Mode.PRIVATE)
    with BuildSketch(Plane(origin=(0.102538638, 0.272461362, -1.6), x_dir=(0.7068394360706932, 0.7068394360706998, -0.027495876609399512), z_dir=(0.7071067811865508, -0.7071067811865442, 0))) as chamfer1_piece_23b_section:
        Polygon((CHAMFER1_SIZE * 0.999621916911, CHAMFER1_SIZE * 0.0274958766094), (-CHAMFER1_SIZE * 0.0274958766932, CHAMFER1_SIZE * 0.999621916909), (0, 0), align=None)
    chamfer1_piece_23b = extrude(amount=0.449610628, mode=Mode.PRIVATE)
    chamfer1_piece_23b = split(chamfer1_piece_23b, bisect_by=Plane(origin=(0.134594641, 0.227, -1.592047672), z_dir=(0, 1, 0)), keep=Keep.TOP, mode=Mode.PRIVATE)
    chamfer1_piece_23 = chamfer1_piece_23a & chamfer1_piece_23b
    add(chamfer1_piece_23, mode=Mode.SUBTRACT)


solid = part.part
